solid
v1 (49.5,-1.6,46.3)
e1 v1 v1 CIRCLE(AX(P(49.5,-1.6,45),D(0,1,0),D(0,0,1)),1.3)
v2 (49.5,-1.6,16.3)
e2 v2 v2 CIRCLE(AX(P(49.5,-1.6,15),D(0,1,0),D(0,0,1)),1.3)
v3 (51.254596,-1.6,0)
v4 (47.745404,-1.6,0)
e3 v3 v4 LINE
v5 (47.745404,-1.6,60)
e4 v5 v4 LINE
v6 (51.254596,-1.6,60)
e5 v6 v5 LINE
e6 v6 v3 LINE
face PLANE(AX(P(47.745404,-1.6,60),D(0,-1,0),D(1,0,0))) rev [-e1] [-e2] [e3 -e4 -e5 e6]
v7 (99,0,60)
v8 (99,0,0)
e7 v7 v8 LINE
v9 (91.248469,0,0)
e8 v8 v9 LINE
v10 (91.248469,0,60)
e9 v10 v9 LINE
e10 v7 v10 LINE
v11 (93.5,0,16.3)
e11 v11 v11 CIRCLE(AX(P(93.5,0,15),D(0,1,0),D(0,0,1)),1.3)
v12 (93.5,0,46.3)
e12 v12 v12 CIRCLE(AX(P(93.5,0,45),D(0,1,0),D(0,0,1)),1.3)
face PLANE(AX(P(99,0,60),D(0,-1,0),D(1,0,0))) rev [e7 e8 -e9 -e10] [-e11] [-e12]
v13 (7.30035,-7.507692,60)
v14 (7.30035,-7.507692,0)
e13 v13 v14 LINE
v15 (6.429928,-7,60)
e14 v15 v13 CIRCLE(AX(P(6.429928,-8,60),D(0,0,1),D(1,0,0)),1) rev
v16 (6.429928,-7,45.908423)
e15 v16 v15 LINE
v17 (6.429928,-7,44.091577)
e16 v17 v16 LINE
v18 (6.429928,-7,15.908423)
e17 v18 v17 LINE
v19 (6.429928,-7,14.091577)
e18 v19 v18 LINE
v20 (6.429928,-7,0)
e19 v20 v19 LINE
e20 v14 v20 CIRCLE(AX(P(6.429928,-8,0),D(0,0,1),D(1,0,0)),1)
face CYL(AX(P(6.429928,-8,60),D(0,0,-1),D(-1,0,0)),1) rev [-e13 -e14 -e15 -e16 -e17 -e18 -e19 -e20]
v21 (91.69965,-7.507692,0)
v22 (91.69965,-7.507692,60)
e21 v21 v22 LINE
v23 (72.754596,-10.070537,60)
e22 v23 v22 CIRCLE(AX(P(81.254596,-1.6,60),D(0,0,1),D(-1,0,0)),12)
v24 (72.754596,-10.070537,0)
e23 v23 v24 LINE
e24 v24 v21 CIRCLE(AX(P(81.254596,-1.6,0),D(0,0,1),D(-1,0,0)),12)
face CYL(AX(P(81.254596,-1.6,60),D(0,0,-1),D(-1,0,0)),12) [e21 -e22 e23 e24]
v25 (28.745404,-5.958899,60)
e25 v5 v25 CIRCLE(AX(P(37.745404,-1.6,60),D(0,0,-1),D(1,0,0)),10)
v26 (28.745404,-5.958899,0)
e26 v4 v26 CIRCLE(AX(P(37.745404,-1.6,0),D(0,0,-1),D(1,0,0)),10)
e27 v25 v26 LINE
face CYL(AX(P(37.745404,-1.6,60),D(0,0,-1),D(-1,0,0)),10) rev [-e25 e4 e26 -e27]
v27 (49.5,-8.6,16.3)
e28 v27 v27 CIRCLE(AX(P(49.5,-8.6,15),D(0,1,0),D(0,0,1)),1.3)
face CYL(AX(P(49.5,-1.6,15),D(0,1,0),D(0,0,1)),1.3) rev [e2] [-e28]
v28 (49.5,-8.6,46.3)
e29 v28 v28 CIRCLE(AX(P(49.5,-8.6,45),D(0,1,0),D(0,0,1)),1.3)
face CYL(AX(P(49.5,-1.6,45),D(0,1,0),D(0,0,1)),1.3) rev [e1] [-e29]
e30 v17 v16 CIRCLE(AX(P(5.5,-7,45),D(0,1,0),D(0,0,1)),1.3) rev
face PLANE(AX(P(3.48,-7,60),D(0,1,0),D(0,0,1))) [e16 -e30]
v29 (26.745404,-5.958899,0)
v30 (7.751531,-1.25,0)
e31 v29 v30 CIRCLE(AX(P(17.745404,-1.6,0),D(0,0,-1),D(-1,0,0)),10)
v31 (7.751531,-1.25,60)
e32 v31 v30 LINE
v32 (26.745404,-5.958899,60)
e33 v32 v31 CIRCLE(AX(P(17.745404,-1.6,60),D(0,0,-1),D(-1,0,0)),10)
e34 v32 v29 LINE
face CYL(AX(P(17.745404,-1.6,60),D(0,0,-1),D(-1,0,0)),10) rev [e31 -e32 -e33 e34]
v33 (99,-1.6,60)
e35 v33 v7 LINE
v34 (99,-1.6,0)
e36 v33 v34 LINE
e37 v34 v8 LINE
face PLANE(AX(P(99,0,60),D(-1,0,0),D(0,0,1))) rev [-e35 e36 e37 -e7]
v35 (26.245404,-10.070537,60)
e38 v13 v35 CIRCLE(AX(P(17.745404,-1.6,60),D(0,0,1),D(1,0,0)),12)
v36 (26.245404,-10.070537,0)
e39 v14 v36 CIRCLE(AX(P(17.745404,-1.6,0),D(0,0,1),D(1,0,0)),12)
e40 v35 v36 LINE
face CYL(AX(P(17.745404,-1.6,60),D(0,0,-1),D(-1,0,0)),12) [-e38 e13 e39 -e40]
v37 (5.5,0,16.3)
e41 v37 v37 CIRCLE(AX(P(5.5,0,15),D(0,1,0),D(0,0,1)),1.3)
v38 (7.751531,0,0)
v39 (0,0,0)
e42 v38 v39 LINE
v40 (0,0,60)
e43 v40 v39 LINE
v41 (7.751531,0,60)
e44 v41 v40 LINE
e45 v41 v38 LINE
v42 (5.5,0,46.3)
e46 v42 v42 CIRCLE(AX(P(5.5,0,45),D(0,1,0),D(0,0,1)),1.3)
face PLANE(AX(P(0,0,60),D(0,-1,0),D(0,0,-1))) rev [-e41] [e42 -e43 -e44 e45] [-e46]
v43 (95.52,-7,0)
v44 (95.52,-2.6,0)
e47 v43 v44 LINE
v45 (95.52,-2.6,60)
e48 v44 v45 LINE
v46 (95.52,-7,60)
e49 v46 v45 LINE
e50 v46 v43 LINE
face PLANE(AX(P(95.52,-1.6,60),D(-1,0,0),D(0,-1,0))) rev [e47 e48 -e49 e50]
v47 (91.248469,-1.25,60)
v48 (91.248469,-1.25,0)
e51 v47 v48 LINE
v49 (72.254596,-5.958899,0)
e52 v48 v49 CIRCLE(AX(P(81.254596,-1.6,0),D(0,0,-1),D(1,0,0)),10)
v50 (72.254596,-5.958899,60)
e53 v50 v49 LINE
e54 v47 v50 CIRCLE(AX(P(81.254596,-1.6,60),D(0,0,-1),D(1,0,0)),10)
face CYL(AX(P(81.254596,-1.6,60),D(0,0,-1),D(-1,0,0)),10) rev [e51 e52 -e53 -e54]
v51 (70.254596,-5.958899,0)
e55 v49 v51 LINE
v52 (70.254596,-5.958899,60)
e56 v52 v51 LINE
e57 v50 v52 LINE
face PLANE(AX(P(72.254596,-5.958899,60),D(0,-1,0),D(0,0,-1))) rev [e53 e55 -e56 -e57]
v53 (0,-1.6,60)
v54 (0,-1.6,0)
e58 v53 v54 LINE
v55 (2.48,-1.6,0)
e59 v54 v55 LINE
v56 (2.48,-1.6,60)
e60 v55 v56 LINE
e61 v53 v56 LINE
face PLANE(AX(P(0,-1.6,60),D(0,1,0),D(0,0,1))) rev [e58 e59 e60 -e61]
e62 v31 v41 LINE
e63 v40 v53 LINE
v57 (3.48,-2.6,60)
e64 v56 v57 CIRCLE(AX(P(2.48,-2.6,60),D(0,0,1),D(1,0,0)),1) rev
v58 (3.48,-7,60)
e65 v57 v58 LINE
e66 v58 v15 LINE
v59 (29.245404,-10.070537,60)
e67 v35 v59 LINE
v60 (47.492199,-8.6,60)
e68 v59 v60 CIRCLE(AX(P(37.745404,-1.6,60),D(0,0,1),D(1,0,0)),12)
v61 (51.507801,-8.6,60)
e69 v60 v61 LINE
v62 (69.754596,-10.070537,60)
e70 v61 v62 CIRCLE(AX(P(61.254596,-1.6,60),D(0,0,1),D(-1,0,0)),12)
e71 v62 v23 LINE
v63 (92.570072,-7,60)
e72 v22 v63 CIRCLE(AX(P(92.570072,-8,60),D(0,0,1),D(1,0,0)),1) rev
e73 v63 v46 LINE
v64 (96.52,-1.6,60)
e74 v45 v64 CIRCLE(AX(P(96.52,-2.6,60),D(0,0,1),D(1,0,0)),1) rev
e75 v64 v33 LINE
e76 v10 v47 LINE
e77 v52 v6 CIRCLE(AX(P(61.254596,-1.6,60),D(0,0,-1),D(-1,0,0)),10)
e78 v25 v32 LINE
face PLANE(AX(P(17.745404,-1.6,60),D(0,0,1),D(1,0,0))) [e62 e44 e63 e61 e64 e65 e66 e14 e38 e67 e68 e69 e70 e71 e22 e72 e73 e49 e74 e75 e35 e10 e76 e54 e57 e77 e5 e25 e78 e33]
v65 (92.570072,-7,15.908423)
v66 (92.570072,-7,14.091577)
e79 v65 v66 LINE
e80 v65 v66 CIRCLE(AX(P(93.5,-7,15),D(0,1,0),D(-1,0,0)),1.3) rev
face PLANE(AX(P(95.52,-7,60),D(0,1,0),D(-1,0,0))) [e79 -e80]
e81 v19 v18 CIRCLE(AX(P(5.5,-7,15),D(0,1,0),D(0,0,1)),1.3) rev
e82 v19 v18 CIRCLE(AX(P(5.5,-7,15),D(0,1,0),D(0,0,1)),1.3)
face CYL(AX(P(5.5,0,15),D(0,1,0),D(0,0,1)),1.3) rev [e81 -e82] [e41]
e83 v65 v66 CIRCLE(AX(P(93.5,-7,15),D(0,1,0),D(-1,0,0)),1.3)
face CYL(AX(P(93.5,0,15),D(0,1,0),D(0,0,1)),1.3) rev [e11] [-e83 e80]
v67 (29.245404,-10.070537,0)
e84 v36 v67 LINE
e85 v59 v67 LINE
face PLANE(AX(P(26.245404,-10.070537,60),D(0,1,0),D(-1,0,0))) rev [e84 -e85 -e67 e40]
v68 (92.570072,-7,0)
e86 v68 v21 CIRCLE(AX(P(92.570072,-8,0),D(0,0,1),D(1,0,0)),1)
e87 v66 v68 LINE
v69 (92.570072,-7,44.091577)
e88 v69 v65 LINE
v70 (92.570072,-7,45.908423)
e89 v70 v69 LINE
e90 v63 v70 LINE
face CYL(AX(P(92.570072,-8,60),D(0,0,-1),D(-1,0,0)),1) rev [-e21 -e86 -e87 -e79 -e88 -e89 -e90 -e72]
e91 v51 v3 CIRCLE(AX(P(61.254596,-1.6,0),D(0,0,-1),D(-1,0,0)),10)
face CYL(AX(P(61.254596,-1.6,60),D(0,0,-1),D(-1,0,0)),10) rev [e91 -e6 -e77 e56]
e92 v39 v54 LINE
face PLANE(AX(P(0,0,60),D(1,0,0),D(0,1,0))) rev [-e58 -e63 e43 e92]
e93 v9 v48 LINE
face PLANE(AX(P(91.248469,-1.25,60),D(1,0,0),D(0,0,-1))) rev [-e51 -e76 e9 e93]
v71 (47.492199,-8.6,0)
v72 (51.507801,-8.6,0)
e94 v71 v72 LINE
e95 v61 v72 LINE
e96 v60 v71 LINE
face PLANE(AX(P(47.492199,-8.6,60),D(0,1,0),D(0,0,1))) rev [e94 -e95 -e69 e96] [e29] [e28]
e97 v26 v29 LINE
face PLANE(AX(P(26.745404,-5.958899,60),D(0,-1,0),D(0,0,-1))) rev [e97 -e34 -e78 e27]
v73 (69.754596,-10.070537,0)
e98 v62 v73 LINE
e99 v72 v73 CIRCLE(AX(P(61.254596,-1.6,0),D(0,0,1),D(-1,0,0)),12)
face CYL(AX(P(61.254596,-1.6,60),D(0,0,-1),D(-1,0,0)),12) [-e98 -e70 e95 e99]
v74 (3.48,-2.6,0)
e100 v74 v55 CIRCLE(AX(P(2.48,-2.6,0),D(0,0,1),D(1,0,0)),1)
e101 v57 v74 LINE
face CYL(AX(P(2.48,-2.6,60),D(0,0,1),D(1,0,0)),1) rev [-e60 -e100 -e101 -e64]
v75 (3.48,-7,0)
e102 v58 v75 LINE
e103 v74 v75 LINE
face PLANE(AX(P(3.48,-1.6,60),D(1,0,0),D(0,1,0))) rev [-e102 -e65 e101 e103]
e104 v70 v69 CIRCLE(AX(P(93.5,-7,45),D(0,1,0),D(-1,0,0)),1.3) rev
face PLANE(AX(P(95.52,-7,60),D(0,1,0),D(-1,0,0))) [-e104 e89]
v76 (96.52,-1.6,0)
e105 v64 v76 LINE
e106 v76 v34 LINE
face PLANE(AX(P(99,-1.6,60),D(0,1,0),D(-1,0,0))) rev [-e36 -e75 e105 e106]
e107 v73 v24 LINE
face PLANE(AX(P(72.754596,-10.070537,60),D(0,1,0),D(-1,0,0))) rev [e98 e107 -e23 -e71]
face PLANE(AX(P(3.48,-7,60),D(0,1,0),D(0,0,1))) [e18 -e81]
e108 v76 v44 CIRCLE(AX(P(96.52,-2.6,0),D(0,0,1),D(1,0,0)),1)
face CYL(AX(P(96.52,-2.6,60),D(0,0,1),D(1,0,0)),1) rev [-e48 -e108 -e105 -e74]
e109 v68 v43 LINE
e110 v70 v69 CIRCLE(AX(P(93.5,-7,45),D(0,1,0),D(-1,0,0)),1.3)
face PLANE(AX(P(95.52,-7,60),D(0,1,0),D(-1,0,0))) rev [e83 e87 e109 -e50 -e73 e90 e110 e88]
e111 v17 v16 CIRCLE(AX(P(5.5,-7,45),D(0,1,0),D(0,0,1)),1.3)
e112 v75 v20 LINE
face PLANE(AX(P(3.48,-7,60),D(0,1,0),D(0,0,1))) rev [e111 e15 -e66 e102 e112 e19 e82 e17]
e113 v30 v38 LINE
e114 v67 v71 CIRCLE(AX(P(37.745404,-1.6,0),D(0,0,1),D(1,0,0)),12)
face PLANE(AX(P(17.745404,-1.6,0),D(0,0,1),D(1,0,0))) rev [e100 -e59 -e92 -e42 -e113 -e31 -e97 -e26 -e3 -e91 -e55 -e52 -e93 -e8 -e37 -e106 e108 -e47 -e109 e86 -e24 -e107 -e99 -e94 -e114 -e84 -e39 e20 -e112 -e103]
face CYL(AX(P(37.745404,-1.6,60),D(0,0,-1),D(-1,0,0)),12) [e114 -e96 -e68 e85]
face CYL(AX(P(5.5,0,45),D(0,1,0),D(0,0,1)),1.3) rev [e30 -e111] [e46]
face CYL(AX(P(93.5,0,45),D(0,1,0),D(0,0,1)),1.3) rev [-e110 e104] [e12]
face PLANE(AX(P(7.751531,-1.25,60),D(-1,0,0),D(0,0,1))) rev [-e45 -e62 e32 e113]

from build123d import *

# Parameters (mm, degrees)
BOSS_EXTRUDE1_DEPTH                  = 60
FILLET1_R                            = 1
F_2_6_START                          = -7
F_2_6_2_6_DIAMETER_HOLE1_OUTLINE_R   = 1.3
F_2_6_2_6_DIAMETER_HOLE1_DEPTH       = 7
F_2_6_START_2                        = -8.6
F_2_6_2_6_DIAMETER_HOLE1_2_OUTLINE_R = 1.3
F_2_6_2_6_DIAMETER_HOLE1_2_DEPTH     = 1.6


# Read off the part's stored shape, not the designer's step: Ø2.6 (2.6) Diameter Hole1
with BuildPart() as part:
    # Sketch1 → Boss-Extrude1 (new body)
    with BuildSketch(Plane.XY):
        with BuildLine():
            Line((0, 0), (7.751531367, 0))
            Line((7.751531367, 0), (7.751531367, -1.25))
            ThreePointArc((7.751531367, -1.25), (15.339084008, -11.30616411), (26.74540449, -5.958898944))
            Line((26.74540449, -5.958898944), (28.74540449, -5.958898944))
            ThreePointArc((28.74540449, -5.958898944), (39.981472468, -11.346794345), (47.74540449, -1.6))
            Line((47.74540449, -1.6), (51.25459551, -1.6))
            ThreePointArc((51.25459551, -1.6), (59.018527532, -11.346794345), (70.25459551, -5.958898944))
            Line((70.25459551, -5.958898944), (72.25459551, -5.958898944))
            ThreePointArc((72.25459551, -5.958898944), (83.660915992, -11.30616411), (91.248468633, -1.25))
            Line((91.248468633, -1.25), (91.248468633, 0))
            Line((91.248468633, 0), (99, 0))
            Line((99, 0), (99, -1.6))
            Line((99, -1.6), (95.52, -1.6))
            Line((95.52, -1.6), (95.52, -7))
            Line((95.52, -7), (91.970938169, -7))
            ThreePointArc((91.970938169, -7), (83.148029778, -13.449679602), (72.75459551, -10.070537173))
            Line((72.75459551, -10.070537173), (69.75459551, -10.070537173))
            ThreePointArc((69.75459551, -10.070537173), (60.290622518, -13.561218837), (51.507801165, -8.6))
            Line((51.507801165, -8.6), (47.492198835, -8.6))
            ThreePointArc((47.492198835, -8.6), (38.709377482, -13.561218837), (29.24540449, -10.070537173))
            Line((29.24540449, -10.070537173), (26.24540449, -10.070537173))
            ThreePointArc((26.24540449, -10.070537173), (15.851970222, -13.449679602), (7.029061831, -7))
            Line((7.029061831, -7), (3.48, -7))
            Line((3.48, -7), (3.48, -1.6))
            Line((3.48, -1.6), (0, -1.6))
            Line((0, -1.6), (0, 0))
        make_face()
    extrude(amount=BOSS_EXTRUDE1_DEPTH)

    # Fillet1
    fillet1_edges = [part.edges().sort_by_distance(p)[0] for p in [
        (95.52, -1.6, 30),
        (91.970938169, -7, 30),
        (7.029061831, -7, 30),
        (3.48, -1.6, 30),
    ]]
    fillet(fillet1_edges, radius=FILLET1_R)

    # Ø2.6 (2.6) Diameter Hole1 outline → Ø2.6 (2.6) Diameter Hole1 (cut)
    with BuildSketch(Plane(origin=(0, 0, 0), x_dir=(1, 0, 0), z_dir=(0, 1, 0)).offset(F_2_6_START)):
        with Locations((93.5, -15)):
            Circle(F_2_6_2_6_DIAMETER_HOLE1_OUTLINE_R)
        with Locations((93.5, -45)):
            Circle(F_2_6_2_6_DIAMETER_HOLE1_OUTLINE_R)
        with Locations((49.5, -15)):
            Circle(F_2_6_2_6_DIAMETER_HOLE1_OUTLINE_R)
        with Locations((49.5, -45)):
            Circle(F_2_6_2_6_DIAMETER_HOLE1_OUTLINE_R)
    f_2_6_2_6_diameter_hole1 = extrude(amount=F_2_6_2_6_DIAMETER_HOLE1_DEPTH, mode=Mode.SUBTRACT)

    # 2.6 _2.6_ Diameter Hole1 2 outline → 2.6 _2.6_ Diameter Hole1 2 (cut)
    with BuildSketch(Plane(origin=(0, 0, 0), x_dir=(1, 0, 0), z_dir=(0, 1, 0)).offset(F_2_6_START_2)):
        with Locations((49.5, -15)):
            Circle(F_2_6_2_6_DIAMETER_HOLE1_2_OUTLINE_R)
        with Locations((49.5, -45)):
            Circle(F_2_6_2_6_DIAMETER_HOLE1_2_OUTLINE_R)
    f_2_6_2_6_diameter_hole1_2 = extrude(amount=F_2_6_2_6_DIAMETER_HOLE1_2_DEPTH, mode=Mode.SUBTRACT)

    # Mirror1: Ø2.6 (2.6) Diameter Hole1, 2.6 _2.6_ Diameter Hole1 2 across plane
    add(f_2_6_2_6_diameter_hole1.mirror(Plane.ZY.offset(-49.5)), mode=Mode.SUBTRACT)
    add(f_2_6_2_6_diameter_hole1_2.mirror(Plane.ZY.offset(-49.5)), mode=Mode.SUBTRACT)


solid = part.part
